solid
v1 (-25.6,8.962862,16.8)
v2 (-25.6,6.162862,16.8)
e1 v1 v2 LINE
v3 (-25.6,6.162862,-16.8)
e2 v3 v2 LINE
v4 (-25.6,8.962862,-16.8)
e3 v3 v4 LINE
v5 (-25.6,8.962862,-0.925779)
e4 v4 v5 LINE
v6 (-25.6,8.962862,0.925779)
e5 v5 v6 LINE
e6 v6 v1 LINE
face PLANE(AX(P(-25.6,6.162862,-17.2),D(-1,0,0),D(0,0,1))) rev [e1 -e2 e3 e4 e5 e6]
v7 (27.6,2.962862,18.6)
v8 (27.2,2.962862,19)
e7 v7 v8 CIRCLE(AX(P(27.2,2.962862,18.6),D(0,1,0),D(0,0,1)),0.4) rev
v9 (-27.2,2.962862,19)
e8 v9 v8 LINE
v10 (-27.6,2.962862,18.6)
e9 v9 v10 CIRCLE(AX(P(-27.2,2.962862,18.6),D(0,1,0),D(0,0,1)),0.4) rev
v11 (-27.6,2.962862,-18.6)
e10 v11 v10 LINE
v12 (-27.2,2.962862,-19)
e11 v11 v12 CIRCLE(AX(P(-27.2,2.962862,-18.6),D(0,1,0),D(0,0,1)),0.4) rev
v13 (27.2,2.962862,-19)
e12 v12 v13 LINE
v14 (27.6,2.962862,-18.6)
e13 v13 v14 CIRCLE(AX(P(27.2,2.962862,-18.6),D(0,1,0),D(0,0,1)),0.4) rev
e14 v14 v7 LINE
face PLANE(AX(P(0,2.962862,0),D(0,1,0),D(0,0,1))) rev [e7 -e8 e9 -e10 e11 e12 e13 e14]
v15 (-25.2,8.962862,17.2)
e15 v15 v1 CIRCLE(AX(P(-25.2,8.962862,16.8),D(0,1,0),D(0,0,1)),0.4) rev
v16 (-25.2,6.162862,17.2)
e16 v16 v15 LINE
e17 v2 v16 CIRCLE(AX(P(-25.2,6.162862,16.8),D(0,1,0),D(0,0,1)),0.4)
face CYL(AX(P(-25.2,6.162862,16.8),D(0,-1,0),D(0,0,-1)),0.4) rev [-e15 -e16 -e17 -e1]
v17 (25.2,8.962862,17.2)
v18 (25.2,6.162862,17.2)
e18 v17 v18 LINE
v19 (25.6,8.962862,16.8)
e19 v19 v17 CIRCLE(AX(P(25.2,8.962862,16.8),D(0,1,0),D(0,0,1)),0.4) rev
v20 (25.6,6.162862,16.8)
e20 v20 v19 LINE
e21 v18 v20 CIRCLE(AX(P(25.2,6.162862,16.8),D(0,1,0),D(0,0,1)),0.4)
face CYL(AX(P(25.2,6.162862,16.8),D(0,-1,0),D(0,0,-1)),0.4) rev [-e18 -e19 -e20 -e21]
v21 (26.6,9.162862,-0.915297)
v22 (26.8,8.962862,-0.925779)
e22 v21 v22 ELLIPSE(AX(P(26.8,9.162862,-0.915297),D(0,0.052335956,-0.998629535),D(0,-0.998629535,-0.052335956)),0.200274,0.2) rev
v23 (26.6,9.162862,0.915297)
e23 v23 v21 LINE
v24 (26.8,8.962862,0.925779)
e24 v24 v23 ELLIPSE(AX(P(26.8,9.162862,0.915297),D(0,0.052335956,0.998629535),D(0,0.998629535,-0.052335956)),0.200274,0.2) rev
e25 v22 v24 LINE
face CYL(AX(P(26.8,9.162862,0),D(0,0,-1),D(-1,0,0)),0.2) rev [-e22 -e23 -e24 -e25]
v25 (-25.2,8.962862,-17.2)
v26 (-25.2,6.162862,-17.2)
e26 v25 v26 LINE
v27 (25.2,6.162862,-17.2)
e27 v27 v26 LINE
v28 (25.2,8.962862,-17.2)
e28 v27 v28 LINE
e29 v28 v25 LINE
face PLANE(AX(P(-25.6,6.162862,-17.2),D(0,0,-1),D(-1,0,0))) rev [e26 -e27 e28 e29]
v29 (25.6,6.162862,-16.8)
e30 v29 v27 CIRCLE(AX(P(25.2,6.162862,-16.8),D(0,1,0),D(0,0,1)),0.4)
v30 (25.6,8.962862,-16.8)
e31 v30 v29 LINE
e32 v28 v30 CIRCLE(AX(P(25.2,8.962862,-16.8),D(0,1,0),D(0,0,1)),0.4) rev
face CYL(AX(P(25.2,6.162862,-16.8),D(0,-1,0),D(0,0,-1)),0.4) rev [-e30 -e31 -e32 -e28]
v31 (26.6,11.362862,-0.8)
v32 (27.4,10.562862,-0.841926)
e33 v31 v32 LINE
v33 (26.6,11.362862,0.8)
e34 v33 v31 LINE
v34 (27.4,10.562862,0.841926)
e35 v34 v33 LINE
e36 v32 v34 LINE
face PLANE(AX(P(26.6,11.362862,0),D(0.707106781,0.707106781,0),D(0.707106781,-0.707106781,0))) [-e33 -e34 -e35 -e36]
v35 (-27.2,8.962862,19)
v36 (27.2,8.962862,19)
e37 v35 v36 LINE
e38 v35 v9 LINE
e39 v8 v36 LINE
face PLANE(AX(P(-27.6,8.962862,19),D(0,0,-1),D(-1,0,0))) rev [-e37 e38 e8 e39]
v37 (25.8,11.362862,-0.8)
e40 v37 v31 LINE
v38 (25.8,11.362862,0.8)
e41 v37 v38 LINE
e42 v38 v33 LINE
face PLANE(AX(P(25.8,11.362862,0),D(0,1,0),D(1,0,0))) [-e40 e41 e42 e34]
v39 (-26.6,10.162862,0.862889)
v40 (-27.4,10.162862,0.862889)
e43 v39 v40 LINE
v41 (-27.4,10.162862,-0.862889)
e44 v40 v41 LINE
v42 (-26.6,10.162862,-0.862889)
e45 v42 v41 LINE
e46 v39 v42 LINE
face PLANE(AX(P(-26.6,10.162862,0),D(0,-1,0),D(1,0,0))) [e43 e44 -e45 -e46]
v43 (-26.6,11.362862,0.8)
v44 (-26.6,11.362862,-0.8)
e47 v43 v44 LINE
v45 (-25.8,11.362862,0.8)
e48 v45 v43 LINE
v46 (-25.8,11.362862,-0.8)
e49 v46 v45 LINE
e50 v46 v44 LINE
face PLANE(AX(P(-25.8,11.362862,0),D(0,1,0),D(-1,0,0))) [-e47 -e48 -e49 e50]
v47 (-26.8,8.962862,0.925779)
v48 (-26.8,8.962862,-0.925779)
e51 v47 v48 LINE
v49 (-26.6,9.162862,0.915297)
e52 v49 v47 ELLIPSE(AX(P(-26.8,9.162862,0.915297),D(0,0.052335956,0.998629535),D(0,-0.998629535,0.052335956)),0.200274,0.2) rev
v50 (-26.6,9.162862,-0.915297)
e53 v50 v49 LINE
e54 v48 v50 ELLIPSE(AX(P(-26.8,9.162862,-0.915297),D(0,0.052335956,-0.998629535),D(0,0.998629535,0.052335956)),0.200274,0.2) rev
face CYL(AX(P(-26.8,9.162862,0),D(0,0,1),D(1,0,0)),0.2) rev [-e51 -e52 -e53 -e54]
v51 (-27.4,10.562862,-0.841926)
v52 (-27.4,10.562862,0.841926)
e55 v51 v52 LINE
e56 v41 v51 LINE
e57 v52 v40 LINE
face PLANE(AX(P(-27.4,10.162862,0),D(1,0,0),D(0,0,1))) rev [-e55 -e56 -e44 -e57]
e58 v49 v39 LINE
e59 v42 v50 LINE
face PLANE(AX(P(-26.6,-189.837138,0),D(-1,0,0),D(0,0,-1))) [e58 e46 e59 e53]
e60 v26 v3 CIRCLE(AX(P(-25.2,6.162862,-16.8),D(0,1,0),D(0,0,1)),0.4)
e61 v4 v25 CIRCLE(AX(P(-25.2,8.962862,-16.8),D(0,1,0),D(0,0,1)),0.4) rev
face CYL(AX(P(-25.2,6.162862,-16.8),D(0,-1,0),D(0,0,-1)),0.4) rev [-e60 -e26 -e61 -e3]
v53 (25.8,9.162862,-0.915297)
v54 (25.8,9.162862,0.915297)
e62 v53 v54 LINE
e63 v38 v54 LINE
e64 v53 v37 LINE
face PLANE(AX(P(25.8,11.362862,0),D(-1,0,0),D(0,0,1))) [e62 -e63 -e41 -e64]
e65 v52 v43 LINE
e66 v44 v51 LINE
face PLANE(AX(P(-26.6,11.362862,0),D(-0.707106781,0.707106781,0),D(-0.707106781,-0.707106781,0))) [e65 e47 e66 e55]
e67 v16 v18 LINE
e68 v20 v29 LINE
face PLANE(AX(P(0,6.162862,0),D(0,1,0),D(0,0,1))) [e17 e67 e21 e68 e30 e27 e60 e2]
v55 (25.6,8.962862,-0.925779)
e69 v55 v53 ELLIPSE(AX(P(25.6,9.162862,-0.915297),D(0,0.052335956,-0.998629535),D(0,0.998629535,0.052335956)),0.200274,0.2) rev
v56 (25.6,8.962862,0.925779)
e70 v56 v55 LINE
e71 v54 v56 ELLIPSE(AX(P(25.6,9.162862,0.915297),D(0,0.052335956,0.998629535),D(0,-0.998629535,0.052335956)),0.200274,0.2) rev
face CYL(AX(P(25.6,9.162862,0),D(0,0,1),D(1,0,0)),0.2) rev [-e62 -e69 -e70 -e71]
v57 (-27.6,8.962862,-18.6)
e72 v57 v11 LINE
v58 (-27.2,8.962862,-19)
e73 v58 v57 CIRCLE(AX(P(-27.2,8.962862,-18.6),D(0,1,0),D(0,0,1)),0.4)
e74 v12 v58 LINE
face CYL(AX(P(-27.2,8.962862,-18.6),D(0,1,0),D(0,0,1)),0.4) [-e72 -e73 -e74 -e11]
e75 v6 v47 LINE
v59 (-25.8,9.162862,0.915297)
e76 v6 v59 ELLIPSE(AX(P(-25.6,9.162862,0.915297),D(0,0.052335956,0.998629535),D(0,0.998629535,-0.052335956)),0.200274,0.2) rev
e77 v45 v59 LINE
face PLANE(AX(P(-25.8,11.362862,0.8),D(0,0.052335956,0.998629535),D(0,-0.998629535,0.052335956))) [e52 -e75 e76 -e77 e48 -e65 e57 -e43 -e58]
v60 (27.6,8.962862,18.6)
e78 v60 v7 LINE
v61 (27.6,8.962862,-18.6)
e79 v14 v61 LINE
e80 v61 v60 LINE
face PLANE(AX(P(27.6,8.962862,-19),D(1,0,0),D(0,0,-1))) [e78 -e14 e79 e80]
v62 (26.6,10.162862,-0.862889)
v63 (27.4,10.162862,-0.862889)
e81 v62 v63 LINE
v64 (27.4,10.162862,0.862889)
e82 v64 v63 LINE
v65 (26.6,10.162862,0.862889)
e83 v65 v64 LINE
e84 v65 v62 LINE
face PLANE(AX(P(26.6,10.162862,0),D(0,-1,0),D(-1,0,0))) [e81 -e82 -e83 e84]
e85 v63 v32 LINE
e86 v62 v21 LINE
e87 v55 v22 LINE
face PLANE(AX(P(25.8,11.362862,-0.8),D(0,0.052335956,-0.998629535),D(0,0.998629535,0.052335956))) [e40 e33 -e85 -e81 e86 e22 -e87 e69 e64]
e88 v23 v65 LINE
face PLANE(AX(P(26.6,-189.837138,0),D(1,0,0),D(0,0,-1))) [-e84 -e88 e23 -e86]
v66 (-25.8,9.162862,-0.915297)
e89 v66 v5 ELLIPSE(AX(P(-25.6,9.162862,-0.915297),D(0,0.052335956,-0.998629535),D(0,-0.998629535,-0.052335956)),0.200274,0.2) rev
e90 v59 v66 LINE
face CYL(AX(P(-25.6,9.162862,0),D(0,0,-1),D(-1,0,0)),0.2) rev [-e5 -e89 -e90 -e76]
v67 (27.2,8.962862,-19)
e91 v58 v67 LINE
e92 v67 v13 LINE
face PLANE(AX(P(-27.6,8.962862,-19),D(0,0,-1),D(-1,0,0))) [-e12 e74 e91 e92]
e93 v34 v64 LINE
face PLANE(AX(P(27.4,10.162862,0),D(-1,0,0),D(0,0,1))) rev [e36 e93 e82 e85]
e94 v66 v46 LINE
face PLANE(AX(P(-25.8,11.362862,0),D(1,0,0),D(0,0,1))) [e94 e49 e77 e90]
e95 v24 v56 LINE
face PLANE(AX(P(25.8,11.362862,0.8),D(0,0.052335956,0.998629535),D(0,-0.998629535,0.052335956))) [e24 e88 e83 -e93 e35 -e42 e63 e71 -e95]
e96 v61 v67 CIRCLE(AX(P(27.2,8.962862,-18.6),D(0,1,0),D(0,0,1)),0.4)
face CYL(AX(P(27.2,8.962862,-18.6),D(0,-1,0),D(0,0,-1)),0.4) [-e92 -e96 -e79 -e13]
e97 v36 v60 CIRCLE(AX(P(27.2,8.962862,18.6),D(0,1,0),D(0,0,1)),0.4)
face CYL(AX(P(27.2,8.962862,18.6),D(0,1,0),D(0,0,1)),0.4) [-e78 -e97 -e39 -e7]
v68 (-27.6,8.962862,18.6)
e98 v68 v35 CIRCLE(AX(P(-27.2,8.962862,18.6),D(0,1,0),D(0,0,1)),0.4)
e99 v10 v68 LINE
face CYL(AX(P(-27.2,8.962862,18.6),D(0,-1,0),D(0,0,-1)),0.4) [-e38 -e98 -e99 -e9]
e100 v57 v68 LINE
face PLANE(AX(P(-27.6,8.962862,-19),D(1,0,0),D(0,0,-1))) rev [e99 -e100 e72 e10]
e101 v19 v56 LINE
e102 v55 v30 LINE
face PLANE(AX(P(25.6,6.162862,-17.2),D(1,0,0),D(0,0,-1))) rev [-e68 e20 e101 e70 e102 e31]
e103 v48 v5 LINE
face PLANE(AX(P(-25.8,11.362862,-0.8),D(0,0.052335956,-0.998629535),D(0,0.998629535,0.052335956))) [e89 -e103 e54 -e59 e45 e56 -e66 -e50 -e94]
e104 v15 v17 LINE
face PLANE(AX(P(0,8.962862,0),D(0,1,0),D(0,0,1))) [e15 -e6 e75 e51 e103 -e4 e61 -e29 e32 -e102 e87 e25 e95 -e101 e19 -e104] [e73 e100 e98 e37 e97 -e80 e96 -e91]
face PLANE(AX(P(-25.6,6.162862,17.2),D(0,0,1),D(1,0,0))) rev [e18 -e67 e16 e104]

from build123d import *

# Parameters (mm, degrees)
SKETCH1_W           = 138
SKETCH1_H           = 95
BOSS_EXTRUDE1_DEPTH = 15
SKETCH2_W           = 128
SKETCH2_H           = 86
CUT_EXTRUDE1_DEPTH  = 7
SNAP_START          = 64.5
SNAP_HOOK2_DEPTH    = 2
SNAP_HOOK2_2_DEPTH  = 2
FILLET1_R           = 1
FILLET2_R           = 0.5
SCALE1_SCALE        = 0.4


with BuildPart() as part:
    # Sketch1 → Boss-Extrude1 (new body)
    with BuildSketch(Plane(origin=(0, 0, 0), x_dir=(1, 0, 0), z_dir=(0, 1, 0))):
        Rectangle(SKETCH1_W, SKETCH1_H)
    extrude(amount=BOSS_EXTRUDE1_DEPTH)

    # Sketch2 → Cut-Extrude1 (cut)
    with BuildSketch(Plane(origin=(0, 15, 0), x_dir=(1, 0, 0), z_dir=(0, 1, 0))):
        Rectangle(SKETCH2_W, SKETCH2_H)
    extrude(amount=-CUT_EXTRUDE1_DEPTH, mode=Mode.SUBTRACT)



with BuildPart() as body_2:
    # Snap Hook2: read off the stored shape, not the designer's step
    # Snap Hook2 outline → Snap Hook2 (new body)
    with BuildSketch(Plane.YZ.offset(SNAP_START)):
        Polygon((21, -2), (21, 2), (18, 2.157223338), (18, -2.157223338), align=None)
    snap_hook2 = extrude(amount=SNAP_HOOK2_DEPTH)


with BuildPart() as part_1:
    add(part.part)

    add(body_2.part)  # Snap Hook2 2 merges body 2
    # Snap Hook2 2 outline → Snap Hook2 2 (add)
    with BuildSketch(Plane.YZ.offset(SNAP_START)):
        Polygon((18, -2.157223338), (18, 2.157223338), (15, 2.314446676), (15, -2.314446676), align=None)
    snap_hook2_2 = extrude(amount=SNAP_HOOK2_2_DEPTH)

    # Snap Hook2 3: loft between two sections, ruled curve by curve
    snap_hook2_3_from = [
        Edge.make_line((66.5, 21, -2), (66.5, 21, 2)),
        Edge.make_line((66.5, 18, 2.157223338), (66.5, 18, -2.157223338)),
        Edge.make_line((66.5, 18, 2.157223338), (66.5, 21, 2)),
        Edge.make_line((66.5, 18, -2.157223338), (66.5, 21, -2)),
    ]
    snap_hook2_3_to = [
        Edge.make_line((68.5, 19, -2.104815559), (68.5, 19, 2.104815559)),
        Edge.make_line((68.5, 18, 2.157223338), (68.5, 18, -2.157223338)),
        Edge.make_line((68.5, 18, 2.157223338), (68.5, 19, 2.104815559)),
        Edge.make_line((68.5, 18, -2.157223338), (68.5, 19, -2.104815559)),
    ]
    snap_hook2_3 = Solid(Shell([*[Face.make_surface_from_curves(snap_hook2_3_from[k], snap_hook2_3_to[k]) for k in range(4)], Face(Wire(snap_hook2_3_from)), Face(Wire(snap_hook2_3_to))]))
    add(snap_hook2_3)

    # Fillet1
    fillet1_edges = [part_1.edges().sort_by_distance(p)[0] for p in [
        (64, 11.5, -43),
        (64, 11.5, 43),
        (-64, 11.5, 43),
        (-64, 11.5, -43),
        (-69, 7.5, -47.5),
        (69, 7.5, -47.5),
        (69, 7.5, 47.5),
        (-69, 7.5, 47.5),
    ]]
    fillet(fillet1_edges, radius=FILLET1_R)

    # Mirror1: Snap Hook2, Snap Hook2 2, Snap Hook2 3 across plane
    add(snap_hook2.mirror(Plane(origin=(0, 0, 0), x_dir=(0, 0, 1), z_dir=(1, 0, 0))))
    add(snap_hook2_2.mirror(Plane(origin=(0, 0, 0), x_dir=(0, 0, 1), z_dir=(1, 0, 0))))
    add(snap_hook2_3.mirror(Plane(origin=(0, 0, 0), x_dir=(0, 0, 1), z_dir=(1, 0, 0))))

    # Fillet2
    fillet2_edges = [part_1.edges().sort_by_distance(p)[0] for p in [
        (66.5, 15, 0),
        (64.5, 15, 0),
        (-66.5, 15, 0),
        (-64.5, 15, 0),
    ]]
    fillet(fillet2_edges, radius=FILLET2_R - 0.0001)  # a hair under: the kernel refuses the full size


with BuildPart() as part_2:
    # Scale1: scaled about (0, 4.938102716, 0)
    add(part_1.part.scale(SCALE1_SCALE).moved(Location((0, 2.96286163, 0))))


solid = part_2.part
